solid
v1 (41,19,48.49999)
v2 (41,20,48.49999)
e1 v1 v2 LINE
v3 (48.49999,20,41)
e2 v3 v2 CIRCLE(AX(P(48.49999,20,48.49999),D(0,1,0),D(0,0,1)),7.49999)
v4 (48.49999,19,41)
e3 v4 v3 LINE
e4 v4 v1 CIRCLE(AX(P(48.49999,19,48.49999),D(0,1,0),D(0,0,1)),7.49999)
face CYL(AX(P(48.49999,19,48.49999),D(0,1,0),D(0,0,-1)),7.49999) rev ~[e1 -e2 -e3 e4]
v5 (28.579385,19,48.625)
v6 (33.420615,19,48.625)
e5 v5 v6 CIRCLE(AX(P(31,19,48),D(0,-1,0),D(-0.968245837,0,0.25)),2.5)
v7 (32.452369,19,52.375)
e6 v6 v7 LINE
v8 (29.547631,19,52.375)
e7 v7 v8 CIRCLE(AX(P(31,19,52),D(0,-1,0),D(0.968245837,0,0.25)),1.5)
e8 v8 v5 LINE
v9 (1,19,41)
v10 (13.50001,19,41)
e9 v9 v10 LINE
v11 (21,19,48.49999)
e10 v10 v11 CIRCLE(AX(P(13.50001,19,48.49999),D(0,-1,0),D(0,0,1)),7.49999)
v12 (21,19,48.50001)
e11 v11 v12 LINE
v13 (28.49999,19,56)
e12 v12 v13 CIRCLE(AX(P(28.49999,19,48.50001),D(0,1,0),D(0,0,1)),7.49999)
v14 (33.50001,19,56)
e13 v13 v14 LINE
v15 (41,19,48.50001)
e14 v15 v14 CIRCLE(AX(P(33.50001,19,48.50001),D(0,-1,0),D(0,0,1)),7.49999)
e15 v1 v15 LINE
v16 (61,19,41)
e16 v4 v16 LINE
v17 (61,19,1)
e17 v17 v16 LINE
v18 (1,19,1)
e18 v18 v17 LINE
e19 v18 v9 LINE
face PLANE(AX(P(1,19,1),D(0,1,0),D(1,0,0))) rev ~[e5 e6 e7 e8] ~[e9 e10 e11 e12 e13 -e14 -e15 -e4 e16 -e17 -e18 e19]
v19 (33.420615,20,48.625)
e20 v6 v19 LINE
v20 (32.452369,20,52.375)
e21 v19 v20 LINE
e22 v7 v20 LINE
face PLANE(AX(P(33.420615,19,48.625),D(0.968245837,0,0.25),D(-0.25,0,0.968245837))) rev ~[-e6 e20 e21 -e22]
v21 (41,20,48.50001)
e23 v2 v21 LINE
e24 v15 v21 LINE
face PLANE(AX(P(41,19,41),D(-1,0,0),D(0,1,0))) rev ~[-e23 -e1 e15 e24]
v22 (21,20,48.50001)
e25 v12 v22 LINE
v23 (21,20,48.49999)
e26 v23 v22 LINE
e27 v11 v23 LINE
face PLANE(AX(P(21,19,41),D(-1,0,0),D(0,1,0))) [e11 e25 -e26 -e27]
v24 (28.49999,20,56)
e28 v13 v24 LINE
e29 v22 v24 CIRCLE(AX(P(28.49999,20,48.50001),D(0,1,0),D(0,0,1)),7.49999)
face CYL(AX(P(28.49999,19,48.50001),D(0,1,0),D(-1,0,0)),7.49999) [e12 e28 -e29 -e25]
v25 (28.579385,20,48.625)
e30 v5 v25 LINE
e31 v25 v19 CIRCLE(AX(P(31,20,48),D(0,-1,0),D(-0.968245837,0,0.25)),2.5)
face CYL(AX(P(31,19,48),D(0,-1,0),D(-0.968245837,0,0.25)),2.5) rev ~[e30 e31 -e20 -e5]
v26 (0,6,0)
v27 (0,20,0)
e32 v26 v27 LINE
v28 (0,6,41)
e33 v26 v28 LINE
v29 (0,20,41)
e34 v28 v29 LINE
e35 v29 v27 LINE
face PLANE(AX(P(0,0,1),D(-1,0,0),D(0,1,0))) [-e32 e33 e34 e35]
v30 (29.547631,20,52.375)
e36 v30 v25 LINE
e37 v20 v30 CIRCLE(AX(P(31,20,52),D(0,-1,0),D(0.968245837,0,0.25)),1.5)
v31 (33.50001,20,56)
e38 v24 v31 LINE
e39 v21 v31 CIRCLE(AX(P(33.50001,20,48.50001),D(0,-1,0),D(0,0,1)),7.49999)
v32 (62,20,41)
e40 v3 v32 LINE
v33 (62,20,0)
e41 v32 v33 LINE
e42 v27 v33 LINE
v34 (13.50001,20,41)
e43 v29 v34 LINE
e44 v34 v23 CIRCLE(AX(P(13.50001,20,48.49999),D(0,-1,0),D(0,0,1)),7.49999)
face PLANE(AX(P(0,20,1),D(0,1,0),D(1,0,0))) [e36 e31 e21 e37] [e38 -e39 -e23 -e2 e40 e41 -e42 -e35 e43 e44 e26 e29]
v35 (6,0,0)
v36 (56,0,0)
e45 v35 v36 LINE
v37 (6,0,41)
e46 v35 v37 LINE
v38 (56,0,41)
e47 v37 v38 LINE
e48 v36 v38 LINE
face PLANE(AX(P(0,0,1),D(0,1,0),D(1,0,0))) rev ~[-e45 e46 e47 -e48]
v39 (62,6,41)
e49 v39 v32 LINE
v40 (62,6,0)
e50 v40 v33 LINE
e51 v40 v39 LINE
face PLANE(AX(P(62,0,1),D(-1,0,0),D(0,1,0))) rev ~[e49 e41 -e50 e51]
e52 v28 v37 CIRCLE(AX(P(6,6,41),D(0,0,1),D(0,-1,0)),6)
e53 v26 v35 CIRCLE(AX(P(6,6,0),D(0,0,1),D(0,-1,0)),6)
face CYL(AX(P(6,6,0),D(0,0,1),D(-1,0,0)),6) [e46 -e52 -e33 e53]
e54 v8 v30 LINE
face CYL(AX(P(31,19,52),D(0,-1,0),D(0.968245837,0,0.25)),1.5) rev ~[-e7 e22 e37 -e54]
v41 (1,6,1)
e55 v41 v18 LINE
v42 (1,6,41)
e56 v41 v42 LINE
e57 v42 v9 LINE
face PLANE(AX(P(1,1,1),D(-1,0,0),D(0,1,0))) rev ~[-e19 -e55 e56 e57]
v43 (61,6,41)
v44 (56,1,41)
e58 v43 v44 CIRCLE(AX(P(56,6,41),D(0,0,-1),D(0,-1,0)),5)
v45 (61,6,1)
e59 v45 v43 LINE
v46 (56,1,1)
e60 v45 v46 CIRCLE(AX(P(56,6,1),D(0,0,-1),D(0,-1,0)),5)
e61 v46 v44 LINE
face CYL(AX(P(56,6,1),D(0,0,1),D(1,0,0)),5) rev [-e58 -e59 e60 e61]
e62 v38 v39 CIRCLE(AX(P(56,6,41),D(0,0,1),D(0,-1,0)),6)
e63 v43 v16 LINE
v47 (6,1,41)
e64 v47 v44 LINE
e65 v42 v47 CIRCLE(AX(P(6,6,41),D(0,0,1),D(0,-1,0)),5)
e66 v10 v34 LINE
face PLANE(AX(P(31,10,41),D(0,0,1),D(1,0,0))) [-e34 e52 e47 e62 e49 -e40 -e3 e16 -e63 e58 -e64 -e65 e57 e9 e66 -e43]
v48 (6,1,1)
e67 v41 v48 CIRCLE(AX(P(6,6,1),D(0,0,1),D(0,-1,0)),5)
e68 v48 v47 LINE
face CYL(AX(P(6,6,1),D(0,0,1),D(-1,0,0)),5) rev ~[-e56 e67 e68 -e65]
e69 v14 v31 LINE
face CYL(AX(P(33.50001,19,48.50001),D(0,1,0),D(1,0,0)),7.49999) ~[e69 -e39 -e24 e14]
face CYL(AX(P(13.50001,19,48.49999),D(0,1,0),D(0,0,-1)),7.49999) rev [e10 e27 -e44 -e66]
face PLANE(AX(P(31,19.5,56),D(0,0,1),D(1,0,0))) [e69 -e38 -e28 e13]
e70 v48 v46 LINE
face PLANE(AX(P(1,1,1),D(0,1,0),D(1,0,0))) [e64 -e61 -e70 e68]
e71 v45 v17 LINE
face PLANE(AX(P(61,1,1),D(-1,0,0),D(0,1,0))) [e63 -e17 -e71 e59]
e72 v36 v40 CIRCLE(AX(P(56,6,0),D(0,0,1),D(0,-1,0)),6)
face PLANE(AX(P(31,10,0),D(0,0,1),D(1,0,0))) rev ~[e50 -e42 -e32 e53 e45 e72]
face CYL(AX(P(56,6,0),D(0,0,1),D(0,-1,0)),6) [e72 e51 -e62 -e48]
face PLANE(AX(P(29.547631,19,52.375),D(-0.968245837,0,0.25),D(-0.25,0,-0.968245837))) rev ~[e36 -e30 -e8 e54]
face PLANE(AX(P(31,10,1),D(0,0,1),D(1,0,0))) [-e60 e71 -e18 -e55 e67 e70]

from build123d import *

# Parameters (mm, degrees)
F0_W     = 62
F0_H     = 20
F1_DEPTH = 1
F2_W     = 62
F2_H     = 20
F2_W_2   = 60
F2_H_2   = 18
F3_DEPTH = 40
F4_R     = 5
F5_R     = 6
F6_W     = 20
F6_H     = 1
F7_DEPTH = 15
F9_DEPTH = 1
F10_R    = 7.49999


# Not quite as in the source:
# - a fillet or chamfer is up to 0.001 mm smaller than in the source, because OpenCascade refuses the exact size


with BuildPart() as f1:
    # F0 (on Top) → F1 (new body)
    with BuildSketch(Plane.XY):
        with Locations((31, 10)):
            Rectangle(F0_W, F0_H)
    extrude(amount=F1_DEPTH)

    # F2 (on face) → F3 (join)
    with BuildSketch(Plane.XY.offset(1)):
        with Locations((31, 10)):
            Rectangle(F2_W, F2_H)
        with Locations((31, 10)):
            Rectangle(F2_W_2, F2_H_2, mode=Mode.SUBTRACT)
    extrude(amount=F3_DEPTH)

    # F4
    f4_edges = [f1.edges().sort_by_distance(p)[0] for p in [
        (1, 1, 21),
        (61, 1, 21),
    ]]
    fillet(f4_edges, radius=F4_R)

    # F5
    f5_edges = [f1.edges().sort_by_distance(p)[0] for p in [
        (0, 0, 20.5),
        (62, 0, 20.5),
    ]]
    fillet(f5_edges, radius=F5_R)

    # F6 (on face) → F7 (join)
    with BuildSketch(Plane.XY.offset(41)):
        with Locations((31, 19.5)):
            Rectangle(F6_W, F6_H)
    extrude(amount=F7_DEPTH)

    # F8 (on face) → F9 (cut, through all)
    with BuildSketch(Plane.XZ.offset(-19)):
        with BuildLine():
            Line((33.4206145914, 48.625), (32.4523687548, 52.375))
            ThreePointArc((32.4523687548, 52.375), (31, 53.5), (29.5476312452, 52.375))
            Line((29.5476312452, 52.375), (28.5793854086, 48.625))
            ThreePointArc((28.5793854086, 48.625), (31, 45.5), (33.4206145914, 48.625))
        make_face()
    extrude(amount=-F9_DEPTH, mode=Mode.SUBTRACT)

    # F10 (radius 7.5 in the source; OpenCascade refuses exactly that, so slightly less here)
    f10_edges = [f1.edges().sort_by_distance(p)[0] for p in [
        (21, 19.5, 56),
        (41, 19.5, 56),
        (41, 19.5, 41),
        (21, 19.5, 41),
    ]]
    fillet(f10_edges, radius=F10_R)


solid = f1.part
